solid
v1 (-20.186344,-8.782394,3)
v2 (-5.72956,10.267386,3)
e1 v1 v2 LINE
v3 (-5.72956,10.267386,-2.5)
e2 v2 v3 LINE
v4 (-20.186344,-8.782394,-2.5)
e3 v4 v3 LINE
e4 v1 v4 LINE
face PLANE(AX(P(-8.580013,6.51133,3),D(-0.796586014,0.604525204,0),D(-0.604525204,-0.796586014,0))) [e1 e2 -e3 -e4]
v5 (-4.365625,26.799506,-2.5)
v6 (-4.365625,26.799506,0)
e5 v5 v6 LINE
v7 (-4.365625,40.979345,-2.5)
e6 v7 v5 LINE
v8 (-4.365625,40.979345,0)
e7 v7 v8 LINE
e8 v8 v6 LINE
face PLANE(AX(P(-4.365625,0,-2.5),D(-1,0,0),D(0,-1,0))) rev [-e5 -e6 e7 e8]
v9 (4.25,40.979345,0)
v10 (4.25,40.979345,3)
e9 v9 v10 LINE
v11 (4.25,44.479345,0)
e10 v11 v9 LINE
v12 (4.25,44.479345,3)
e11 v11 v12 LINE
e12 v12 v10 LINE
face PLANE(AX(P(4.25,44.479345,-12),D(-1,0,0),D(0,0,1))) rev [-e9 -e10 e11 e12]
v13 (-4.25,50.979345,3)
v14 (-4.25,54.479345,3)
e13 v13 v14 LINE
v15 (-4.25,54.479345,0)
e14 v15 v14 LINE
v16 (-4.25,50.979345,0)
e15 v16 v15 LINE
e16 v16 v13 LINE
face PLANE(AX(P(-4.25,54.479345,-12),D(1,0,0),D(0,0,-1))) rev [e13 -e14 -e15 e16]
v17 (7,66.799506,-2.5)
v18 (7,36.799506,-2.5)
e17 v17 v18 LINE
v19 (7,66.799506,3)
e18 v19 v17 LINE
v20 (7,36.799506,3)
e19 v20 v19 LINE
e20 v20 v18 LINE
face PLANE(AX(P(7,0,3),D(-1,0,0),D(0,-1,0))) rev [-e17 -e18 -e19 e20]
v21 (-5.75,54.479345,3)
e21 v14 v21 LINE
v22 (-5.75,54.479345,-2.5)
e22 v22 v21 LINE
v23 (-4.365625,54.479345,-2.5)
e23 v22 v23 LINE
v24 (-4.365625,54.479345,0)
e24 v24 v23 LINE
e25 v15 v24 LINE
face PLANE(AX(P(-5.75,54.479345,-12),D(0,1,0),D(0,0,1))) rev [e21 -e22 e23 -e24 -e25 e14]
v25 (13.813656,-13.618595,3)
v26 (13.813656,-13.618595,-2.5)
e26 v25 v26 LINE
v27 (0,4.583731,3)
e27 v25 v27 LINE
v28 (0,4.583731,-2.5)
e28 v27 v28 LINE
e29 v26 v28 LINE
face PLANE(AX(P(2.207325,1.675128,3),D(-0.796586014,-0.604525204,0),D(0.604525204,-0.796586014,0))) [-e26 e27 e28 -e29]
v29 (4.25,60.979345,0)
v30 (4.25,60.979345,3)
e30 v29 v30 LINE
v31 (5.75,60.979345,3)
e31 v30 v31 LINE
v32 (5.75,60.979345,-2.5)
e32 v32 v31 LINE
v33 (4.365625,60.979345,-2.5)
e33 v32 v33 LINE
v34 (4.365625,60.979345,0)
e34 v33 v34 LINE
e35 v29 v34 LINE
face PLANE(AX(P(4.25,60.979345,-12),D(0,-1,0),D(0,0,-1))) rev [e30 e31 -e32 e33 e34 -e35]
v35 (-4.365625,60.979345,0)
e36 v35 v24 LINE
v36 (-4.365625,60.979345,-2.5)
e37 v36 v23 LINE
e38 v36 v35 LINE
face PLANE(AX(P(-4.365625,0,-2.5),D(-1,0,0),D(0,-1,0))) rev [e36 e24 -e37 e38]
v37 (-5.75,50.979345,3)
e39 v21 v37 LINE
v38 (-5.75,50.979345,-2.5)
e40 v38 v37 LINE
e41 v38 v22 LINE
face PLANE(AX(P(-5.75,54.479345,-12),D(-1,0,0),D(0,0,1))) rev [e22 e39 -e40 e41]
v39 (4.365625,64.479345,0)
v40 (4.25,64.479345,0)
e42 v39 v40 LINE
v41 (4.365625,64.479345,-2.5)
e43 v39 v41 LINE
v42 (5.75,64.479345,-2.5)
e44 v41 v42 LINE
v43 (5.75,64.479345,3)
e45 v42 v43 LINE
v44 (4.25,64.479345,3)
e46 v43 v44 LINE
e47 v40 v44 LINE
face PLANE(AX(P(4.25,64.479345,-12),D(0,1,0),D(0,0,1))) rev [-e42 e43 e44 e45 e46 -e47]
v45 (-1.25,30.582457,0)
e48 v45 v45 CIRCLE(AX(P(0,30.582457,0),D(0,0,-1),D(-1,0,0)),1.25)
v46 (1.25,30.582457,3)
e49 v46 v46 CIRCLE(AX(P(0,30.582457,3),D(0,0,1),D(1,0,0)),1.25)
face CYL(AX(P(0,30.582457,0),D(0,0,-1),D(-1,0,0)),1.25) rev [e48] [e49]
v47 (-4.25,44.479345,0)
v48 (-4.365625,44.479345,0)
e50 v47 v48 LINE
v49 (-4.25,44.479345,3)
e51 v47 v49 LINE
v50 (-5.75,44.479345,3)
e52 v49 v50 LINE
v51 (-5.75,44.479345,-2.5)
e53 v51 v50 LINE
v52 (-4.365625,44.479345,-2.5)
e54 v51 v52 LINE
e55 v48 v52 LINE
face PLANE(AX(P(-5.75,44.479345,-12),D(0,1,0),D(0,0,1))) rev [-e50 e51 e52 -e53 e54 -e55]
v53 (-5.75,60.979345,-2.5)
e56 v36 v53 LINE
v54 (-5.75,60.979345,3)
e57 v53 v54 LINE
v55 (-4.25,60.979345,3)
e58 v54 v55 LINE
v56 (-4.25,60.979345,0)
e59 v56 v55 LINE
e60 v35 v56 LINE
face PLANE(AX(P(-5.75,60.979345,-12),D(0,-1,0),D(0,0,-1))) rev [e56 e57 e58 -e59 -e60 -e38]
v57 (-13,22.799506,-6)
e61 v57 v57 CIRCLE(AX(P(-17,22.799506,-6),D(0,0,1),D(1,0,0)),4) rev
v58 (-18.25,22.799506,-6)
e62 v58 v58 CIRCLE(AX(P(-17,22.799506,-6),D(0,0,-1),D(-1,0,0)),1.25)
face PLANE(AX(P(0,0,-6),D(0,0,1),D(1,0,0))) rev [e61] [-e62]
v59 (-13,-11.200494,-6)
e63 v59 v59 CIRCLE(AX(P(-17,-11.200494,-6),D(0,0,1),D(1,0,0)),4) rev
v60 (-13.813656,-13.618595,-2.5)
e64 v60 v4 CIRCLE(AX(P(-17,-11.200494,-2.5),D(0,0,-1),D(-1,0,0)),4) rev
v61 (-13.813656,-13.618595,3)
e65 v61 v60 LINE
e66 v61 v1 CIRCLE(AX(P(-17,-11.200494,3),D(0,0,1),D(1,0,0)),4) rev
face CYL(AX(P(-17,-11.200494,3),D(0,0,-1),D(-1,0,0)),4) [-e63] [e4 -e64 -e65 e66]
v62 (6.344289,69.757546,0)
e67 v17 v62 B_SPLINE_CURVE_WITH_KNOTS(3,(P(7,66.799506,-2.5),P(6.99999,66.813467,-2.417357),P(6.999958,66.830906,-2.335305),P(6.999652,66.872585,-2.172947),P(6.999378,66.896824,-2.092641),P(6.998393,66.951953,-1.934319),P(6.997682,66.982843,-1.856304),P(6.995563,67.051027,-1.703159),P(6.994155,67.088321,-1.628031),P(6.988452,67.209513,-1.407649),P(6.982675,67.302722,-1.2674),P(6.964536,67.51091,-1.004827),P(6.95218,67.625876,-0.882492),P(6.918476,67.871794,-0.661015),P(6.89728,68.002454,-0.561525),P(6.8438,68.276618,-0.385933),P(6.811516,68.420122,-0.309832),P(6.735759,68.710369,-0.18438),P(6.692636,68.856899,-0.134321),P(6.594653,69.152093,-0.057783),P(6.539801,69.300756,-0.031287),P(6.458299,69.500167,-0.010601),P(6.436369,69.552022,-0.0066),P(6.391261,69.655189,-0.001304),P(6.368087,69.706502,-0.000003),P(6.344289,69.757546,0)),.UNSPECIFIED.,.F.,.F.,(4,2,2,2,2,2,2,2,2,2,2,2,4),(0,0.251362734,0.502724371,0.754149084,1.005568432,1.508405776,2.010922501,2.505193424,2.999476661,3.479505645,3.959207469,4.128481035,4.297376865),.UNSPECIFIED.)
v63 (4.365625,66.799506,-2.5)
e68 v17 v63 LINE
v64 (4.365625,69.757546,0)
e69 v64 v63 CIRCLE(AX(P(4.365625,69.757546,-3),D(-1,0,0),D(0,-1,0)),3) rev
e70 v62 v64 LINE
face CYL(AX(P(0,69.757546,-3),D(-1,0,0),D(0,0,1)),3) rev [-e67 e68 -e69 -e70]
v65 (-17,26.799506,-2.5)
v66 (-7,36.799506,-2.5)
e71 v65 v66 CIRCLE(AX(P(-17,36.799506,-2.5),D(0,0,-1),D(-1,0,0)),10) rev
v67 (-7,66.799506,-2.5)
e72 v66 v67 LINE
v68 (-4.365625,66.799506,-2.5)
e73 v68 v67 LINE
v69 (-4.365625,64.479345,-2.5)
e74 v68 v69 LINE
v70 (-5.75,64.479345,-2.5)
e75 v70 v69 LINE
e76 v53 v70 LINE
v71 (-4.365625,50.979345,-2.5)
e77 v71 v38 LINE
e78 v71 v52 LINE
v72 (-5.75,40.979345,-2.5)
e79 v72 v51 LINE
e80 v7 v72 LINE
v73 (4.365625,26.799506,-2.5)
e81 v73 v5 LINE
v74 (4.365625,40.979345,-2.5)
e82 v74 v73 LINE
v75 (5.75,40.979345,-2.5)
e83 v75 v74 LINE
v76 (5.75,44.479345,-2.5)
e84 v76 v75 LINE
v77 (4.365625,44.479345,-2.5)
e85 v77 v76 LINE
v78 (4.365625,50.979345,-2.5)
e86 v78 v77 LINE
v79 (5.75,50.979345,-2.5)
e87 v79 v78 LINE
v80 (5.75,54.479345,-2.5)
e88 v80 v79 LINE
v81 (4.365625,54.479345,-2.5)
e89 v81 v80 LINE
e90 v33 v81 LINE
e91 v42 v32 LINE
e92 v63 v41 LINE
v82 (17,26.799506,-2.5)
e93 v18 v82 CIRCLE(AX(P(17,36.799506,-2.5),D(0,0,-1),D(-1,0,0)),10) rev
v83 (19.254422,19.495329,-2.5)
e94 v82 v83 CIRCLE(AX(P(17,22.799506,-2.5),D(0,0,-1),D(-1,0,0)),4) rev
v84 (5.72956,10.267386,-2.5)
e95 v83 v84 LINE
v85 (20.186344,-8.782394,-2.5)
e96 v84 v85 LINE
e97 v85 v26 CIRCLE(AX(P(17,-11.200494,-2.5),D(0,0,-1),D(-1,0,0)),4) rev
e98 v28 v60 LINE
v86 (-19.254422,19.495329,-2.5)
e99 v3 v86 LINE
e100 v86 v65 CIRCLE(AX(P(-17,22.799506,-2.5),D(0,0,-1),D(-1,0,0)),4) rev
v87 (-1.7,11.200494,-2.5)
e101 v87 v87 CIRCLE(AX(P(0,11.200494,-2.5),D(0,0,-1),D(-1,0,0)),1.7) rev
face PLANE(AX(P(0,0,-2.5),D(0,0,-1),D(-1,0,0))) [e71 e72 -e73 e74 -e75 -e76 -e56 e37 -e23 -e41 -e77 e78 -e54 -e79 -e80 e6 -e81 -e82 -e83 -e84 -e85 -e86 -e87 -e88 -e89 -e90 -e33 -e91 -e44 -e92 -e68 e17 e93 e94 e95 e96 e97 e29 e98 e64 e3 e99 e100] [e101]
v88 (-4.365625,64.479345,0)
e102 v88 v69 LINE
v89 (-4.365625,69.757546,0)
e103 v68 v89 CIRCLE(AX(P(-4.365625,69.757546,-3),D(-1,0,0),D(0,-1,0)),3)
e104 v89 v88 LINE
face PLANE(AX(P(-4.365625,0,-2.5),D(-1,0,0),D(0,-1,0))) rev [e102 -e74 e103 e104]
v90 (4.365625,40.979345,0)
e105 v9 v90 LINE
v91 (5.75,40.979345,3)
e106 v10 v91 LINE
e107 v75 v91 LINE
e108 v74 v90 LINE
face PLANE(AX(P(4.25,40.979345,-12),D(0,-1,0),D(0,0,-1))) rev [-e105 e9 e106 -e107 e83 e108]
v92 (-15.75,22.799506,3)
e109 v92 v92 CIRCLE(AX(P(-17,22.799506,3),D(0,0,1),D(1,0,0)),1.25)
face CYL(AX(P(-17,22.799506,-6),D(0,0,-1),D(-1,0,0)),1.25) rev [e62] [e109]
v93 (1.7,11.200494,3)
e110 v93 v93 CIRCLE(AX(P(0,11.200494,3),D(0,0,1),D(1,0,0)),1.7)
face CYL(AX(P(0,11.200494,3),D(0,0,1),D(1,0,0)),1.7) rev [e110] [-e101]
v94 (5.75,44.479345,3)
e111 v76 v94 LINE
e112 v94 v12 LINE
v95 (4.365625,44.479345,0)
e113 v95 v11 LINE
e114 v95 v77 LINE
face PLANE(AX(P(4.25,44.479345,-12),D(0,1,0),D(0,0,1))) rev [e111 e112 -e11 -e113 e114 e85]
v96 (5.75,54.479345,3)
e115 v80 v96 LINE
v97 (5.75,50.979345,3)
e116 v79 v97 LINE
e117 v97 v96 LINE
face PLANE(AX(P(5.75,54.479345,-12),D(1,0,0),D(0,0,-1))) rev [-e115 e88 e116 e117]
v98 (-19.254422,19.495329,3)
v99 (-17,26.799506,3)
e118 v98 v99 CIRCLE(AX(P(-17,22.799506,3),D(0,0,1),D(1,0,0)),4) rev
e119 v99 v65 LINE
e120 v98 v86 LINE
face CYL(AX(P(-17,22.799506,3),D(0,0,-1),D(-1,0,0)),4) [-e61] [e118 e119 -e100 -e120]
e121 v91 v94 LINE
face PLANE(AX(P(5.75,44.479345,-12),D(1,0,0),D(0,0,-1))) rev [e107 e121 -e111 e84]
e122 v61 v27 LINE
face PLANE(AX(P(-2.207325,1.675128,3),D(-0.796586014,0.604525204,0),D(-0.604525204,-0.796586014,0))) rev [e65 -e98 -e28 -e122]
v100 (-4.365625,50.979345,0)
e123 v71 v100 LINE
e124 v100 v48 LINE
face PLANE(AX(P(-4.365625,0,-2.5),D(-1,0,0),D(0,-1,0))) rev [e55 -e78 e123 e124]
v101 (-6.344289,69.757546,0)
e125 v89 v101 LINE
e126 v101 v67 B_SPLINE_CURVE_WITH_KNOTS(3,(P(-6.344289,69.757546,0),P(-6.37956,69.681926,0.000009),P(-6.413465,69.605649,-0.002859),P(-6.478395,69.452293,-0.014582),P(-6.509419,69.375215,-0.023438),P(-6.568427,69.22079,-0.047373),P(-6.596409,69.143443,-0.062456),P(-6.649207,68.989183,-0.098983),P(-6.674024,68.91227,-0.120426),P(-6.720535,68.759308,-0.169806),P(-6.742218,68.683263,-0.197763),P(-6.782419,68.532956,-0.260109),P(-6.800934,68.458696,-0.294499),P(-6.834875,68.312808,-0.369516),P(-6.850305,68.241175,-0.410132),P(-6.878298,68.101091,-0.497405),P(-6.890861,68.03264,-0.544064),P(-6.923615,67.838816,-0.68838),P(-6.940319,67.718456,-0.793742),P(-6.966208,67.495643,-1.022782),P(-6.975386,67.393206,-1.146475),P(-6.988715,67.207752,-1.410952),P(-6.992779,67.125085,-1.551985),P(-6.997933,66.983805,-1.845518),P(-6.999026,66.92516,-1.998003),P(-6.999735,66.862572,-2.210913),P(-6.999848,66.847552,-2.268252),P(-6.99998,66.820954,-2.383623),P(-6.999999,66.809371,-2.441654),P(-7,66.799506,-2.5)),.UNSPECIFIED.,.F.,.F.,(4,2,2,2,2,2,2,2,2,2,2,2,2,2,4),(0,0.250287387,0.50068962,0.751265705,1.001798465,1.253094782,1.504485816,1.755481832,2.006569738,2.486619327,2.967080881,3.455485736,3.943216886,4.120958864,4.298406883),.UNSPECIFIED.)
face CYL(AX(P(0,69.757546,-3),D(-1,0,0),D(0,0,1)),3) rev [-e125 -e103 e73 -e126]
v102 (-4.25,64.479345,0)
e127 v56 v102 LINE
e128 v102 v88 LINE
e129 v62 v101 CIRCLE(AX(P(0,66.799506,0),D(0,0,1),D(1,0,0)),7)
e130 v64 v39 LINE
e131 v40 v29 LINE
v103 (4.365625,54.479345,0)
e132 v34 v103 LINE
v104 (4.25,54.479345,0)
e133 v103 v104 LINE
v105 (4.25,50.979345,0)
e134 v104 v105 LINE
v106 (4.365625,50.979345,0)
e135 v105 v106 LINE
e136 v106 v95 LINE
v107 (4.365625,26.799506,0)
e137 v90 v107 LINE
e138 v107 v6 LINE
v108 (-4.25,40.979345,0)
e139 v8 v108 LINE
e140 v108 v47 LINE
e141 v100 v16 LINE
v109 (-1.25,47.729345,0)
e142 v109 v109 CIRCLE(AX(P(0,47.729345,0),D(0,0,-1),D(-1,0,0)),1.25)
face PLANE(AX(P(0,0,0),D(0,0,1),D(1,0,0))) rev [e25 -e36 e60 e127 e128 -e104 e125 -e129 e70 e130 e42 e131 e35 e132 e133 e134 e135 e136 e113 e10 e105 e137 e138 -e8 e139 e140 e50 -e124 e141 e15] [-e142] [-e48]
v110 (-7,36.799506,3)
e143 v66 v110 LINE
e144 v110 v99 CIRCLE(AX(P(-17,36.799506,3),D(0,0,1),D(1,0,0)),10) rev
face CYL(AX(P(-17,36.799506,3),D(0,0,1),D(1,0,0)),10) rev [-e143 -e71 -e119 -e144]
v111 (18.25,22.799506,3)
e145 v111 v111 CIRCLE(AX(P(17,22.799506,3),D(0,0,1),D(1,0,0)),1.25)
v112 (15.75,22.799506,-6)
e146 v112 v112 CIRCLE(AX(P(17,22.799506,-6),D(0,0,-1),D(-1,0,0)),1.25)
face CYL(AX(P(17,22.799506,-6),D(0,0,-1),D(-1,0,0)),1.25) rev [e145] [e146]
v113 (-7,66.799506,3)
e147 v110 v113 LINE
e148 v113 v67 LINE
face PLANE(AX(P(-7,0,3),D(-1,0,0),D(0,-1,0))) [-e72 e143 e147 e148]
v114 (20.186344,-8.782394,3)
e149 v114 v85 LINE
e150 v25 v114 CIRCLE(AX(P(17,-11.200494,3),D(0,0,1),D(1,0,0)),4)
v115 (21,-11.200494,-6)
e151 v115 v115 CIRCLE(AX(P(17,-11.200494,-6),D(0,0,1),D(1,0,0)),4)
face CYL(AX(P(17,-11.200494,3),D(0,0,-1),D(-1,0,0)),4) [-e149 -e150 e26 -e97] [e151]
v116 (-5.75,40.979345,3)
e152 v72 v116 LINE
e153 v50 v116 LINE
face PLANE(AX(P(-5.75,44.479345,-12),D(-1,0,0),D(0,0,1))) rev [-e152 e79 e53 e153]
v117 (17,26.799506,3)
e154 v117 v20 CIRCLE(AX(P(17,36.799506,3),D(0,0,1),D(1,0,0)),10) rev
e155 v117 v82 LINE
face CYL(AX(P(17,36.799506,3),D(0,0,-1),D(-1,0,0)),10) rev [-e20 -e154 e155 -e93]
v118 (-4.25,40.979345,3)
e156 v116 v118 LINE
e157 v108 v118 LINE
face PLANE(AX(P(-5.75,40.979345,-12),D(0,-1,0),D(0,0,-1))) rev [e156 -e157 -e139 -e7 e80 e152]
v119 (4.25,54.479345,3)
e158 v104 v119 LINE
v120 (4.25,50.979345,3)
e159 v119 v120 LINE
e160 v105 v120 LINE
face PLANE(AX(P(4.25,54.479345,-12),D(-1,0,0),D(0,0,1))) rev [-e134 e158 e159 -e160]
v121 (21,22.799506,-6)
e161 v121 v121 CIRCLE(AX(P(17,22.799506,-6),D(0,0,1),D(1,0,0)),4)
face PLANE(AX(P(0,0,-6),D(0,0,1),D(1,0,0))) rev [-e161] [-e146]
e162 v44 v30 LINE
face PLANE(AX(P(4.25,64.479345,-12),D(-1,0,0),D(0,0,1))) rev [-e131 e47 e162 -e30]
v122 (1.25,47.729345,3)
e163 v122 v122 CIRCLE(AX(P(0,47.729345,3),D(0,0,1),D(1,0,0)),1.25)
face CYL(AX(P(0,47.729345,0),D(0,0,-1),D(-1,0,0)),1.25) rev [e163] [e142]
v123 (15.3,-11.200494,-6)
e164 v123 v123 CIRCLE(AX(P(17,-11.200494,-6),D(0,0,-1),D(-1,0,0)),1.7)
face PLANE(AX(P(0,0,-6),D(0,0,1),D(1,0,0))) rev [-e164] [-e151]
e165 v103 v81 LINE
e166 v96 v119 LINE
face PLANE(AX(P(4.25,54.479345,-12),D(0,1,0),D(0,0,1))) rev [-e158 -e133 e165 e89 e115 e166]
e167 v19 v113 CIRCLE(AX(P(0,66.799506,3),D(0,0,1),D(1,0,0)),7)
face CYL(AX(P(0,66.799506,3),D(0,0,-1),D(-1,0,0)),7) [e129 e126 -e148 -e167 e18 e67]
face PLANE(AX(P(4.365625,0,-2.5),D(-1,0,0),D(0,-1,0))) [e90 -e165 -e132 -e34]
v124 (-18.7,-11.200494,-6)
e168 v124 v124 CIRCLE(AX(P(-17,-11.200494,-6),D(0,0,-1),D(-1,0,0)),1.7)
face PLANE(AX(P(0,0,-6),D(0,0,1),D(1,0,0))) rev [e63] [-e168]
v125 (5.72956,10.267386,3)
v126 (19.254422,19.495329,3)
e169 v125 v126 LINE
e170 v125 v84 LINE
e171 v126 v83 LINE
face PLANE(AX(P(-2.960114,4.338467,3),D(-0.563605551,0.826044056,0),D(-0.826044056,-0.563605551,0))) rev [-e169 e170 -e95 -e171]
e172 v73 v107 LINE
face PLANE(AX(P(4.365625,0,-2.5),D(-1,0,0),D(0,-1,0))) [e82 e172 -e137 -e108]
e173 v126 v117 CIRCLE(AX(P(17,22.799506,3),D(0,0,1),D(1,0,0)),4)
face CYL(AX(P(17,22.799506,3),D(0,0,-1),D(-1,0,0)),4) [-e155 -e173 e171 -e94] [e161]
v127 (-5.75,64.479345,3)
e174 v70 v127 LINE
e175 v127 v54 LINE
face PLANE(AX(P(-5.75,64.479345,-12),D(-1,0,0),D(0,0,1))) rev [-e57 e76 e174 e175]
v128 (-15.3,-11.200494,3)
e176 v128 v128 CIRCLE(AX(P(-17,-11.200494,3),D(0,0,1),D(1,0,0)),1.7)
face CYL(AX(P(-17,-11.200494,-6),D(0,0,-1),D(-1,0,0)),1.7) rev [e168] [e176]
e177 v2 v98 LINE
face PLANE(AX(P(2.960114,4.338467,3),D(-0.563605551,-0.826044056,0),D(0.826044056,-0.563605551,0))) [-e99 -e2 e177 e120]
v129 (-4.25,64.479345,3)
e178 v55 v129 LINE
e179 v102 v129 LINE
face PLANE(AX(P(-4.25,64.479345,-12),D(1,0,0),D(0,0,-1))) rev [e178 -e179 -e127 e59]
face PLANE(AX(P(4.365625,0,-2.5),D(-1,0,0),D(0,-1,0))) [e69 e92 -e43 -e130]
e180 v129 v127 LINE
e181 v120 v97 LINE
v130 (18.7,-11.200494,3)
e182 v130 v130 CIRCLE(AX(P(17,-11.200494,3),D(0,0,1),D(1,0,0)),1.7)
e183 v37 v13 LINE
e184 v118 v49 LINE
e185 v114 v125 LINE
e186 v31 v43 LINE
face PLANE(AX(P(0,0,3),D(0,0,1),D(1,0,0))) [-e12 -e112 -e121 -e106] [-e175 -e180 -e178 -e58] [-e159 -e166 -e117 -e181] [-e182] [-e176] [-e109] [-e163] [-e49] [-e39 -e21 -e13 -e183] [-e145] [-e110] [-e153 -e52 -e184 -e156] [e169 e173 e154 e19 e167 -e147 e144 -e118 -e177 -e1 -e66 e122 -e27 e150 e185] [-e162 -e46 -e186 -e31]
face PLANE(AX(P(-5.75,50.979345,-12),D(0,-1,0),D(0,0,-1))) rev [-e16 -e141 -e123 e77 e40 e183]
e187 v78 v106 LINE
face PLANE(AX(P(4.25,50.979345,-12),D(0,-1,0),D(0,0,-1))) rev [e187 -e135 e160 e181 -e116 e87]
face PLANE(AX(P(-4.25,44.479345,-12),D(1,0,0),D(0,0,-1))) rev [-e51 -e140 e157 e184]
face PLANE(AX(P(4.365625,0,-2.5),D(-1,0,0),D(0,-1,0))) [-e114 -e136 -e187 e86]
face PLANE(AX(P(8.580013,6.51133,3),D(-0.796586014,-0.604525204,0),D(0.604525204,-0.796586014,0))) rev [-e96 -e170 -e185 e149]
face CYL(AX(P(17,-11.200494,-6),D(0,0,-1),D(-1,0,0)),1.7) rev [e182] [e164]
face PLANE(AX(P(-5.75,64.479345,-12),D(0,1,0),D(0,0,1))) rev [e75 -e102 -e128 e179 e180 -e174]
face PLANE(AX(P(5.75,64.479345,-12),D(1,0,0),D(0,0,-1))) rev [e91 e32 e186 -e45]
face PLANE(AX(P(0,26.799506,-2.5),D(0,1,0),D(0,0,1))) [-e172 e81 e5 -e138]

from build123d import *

# Parameters (mm, degrees)
BOSS_EXTRUDE1_DEPTH             = 3
BOSS_EXTRUDE2_START             = -6
BOSS_EXTRUDE2_DEPTH             = 6
TAP_DRILL_FOR_M3X0_5_TAP1_D     = 2.5
TAP_DRILL_FOR_M3X0_5_TAP1_DEPTH = 10
TAP_DRILL_FOR_M3X0_5_TAP1_TIP   = 0.751075774
M3_CLEARANCE_HOLE1_D            = 3.4
M3_CLEARANCE_HOLE1_DEPTH        = 10
M3_CLEARANCE_HOLE1_TIP          = 1.021463052
M3_CLEARANCE_HOLE2_D            = 3.4
M3_CLEARANCE_HOLE2_DEPTH        = 10
M3_CLEARANCE_HOLE2_TIP          = 1.021463052
BOSS_EXTRUDE3_START             = 2.5
SKETCH9_R                       = 1.7
BOSS_EXTRUDE3_DEPTH             = 2.5
TAP_DRILL_FOR_M3X0_5_TAP2_D     = 2.5
TAP_DRILL_FOR_M3X0_5_TAP2_DEPTH = 10
TAP_DRILL_FOR_M3X0_5_TAP2_TIP   = 0.751075774
SKETCH8_W                       = 1.5
SKETCH8_H                       = 3.5
CUT_EXTRUDE1_DEPTH              = 15
FILLET3_R                       = 3
FILLET4_R                       = 10


# Some blends are built 0.0001 mm under size
with BuildPart() as part:
    # Sketch1 → Boss-Extrude1 (new body)
    with BuildSketch(Plane.XY):
        with BuildLine():
            Line((-5.729559867, 10.267386408), (-20.186344056, -8.782393513))
            ThreePointArc((-20.186344056, -8.782393513), (-19.418100816, -14.386838385), (-13.813655944, -13.618595145))
            Line((-13.813655944, -13.618595145), (0, 4.583731333))
            Line((0, 4.583731333), (13.813655944, -13.618595145))
            ThreePointArc((13.813655944, -13.618595145), (19.418100816, -14.386838385), (20.186344056, -8.782393513))
            Line((20.186344056, -8.782393513), (5.729559867, 10.267386408))
            Line((5.729559867, 10.267386408), (19.254422206, 19.495329447))
            ThreePointArc((19.254422206, 19.495329447), (20.822087446, 23.979186794), (17, 26.799505671))
            Line((17, 26.799505671), (7, 26.799505671))
            Line((7, 26.799505671), (7, 66.799505671))
            ThreePointArc((7, 66.799505671), (0, 73.799505671), (-7, 66.799505671))
            Line((-7, 66.799505671), (-7, 26.799505671))
            Line((-7, 26.799505671), (-17, 26.799505671))
            ThreePointArc((-17, 26.799505671), (-20.822087446, 23.979186794), (-19.254422206, 19.495329447))
            Line((-19.254422206, 19.495329447), (-5.729559867, 10.267386408))
        make_face()
    extrude(amount=BOSS_EXTRUDE1_DEPTH)

    # Sketch1<3> → Boss-Extrude2 (add)
    with BuildSketch(Plane.XY.offset(BOSS_EXTRUDE2_START)):
        with BuildLine():
            ThreePointArc((-21, 22.799505671), (-20.536784473, 20.931042241), (-19.254422206, 19.495329447))
            ThreePointArc((-19.254422206, 19.495329447), (-15.13153657, 19.262721197), (-13, 22.799505671))
            ThreePointArc((-13, 22.799505671), (-13.463215527, 24.667969101), (-14.745577794, 26.103681895))
            ThreePointArc((-14.745577794, 26.103681895), (-15.820318877, 26.621593117), (-17, 26.799505671))
            ThreePointArc((-17, 26.799505671), (-19.828427125, 25.627932795), (-21, 22.799505671))
        make_face()
        with BuildLine():
            ThreePointArc((14.745577794, 26.103681895), (13.695823776, 20.545083465), (19.254422206, 19.495329447))
            ThreePointArc((19.254422206, 19.495329447), (20.536784473, 20.931042241), (21, 22.799505671))
            ThreePointArc((21, 22.799505671), (19.828427125, 25.627932795), (17, 26.799505671))
            ThreePointArc((17, 26.799505671), (15.820318877, 26.621593117), (14.745577794, 26.103681895))
        make_face()
        with BuildLine():
            ThreePointArc((20.186344056, -8.782393513), (14.581899184, -8.014150273), (13.813655944, -13.618595145))
            ThreePointArc((13.813655944, -13.618595145), (15.221293063, -14.783258853), (17, -15.200494329))
            ThreePointArc((17, -15.200494329), (19.828427125, -14.028921454), (21, -11.200494329))
            ThreePointArc((21, -11.200494329), (20.791132827, -9.924832976), (20.186344056, -8.782393513))
        make_face()
        with BuildLine():
            ThreePointArc((-17, -15.200494329), (-15.221293063, -14.783258853), (-13.813655944, -13.618595145))
            ThreePointArc((-13.813655944, -13.618595145), (-13.208867173, -12.476155682), (-13, -11.200494329))
            ThreePointArc((-13, -11.200494329), (-15.724338647, -7.409361502), (-20.186344056, -8.782393513))
            ThreePointArc((-20.186344056, -8.782393513), (-20.791132827, -9.924832976), (-21, -11.200494329))
            ThreePointArc((-21, -11.200494329), (-19.828427125, -14.028921454), (-17, -15.200494329))
        make_face()
    extrude(amount=BOSS_EXTRUDE2_DEPTH)

    # Tap Drill for M3x0.5 Tap1
    with Locations(Plane(origin=(0, 0, -6), x_dir=(-1, 0, 0), z_dir=(0, 0, -1))):
        with Locations((17, 22.799505671), (-17, 22.799505671)):
            Hole(TAP_DRILL_FOR_M3X0_5_TAP1_D / 2, depth=TAP_DRILL_FOR_M3X0_5_TAP1_DEPTH)
            with Locations((0, 0, -(TAP_DRILL_FOR_M3X0_5_TAP1_DEPTH + TAP_DRILL_FOR_M3X0_5_TAP1_TIP / 2))):  # 118° drill point
                Cone(0, TAP_DRILL_FOR_M3X0_5_TAP1_D / 2, TAP_DRILL_FOR_M3X0_5_TAP1_TIP, mode=Mode.SUBTRACT)

    # M3 Clearance Hole1
    with Locations(Plane(origin=(0, 0, -6), x_dir=(-1, 0, 0), z_dir=(0, 0, -1))):
        with Locations((-17, -11.200494329), (17, -11.200494329)):
            Hole(M3_CLEARANCE_HOLE1_D / 2, depth=M3_CLEARANCE_HOLE1_DEPTH)
            with Locations((0, 0, -(M3_CLEARANCE_HOLE1_DEPTH + M3_CLEARANCE_HOLE1_TIP / 2))):  # 118° drill point
                Cone(0, M3_CLEARANCE_HOLE1_D / 2, M3_CLEARANCE_HOLE1_TIP, mode=Mode.SUBTRACT)

    # M3 Clearance Hole2
    with Locations(Plane.XY.offset(3)):
        with Locations((0, 11.200494329)):
            Hole(M3_CLEARANCE_HOLE2_D / 2, depth=M3_CLEARANCE_HOLE2_DEPTH)
            with Locations((0, 0, -(M3_CLEARANCE_HOLE2_DEPTH + M3_CLEARANCE_HOLE2_TIP / 2))):  # 118° drill point
                Cone(0, M3_CLEARANCE_HOLE2_D / 2, M3_CLEARANCE_HOLE2_TIP, mode=Mode.SUBTRACT)

    # Sketch9 → Boss-Extrude3 (add)
    with BuildSketch(Plane(origin=(0, 0, 0), x_dir=(-1, 0, 0), z_dir=(0, 0, -1)).offset(BOSS_EXTRUDE3_START)):
        with BuildLine():
            Line((7, 66.799505671), (4.365625, 66.799505671))
            Line((4.365625, 66.799505671), (4.365625, 26.799505671))
            Line((4.365625, 26.799505671), (-4.365625, 26.799505671))
            Line((-4.365625, 26.799505671), (-4.365625, 66.799505671))
            Line((-4.365625, 66.799505671), (-7, 66.799505671))
            Line((-7, 66.799505671), (-7, 26.799505671))
            Line((-7, 26.799505671), (-17, 26.799505671))
            ThreePointArc((-17, 26.799505671), (-13.177912554, 21.619824548), (-19.254422206, 19.495329447))
            Line((-19.254422206, 19.495329447), (-5.729559867, 10.267386408))
            Line((-5.729559867, 10.267386408), (-20.186344056, -8.782393513))
            ThreePointArc((-20.186344056, -8.782393513), (-14.581899184, -8.014150273), (-13.813655944, -13.618595145))
            Line((-13.813655944, -13.618595145), (0, 4.583731333))
            Line((0, 4.583731333), (13.813655944, -13.618595145))
            ThreePointArc((13.813655944, -13.618595145), (14.581899184, -8.014150273), (20.186344056, -8.782393513))
            Line((20.186344056, -8.782393513), (5.729559867, 10.267386408))
            Line((5.729559867, 10.267386408), (19.254422206, 19.495329447))
            ThreePointArc((19.254422206, 19.495329447), (13.177912554, 21.619824548), (17, 26.799505671))
            Line((17, 26.799505671), (7, 26.799505671))
            Line((7, 26.799505671), (7, 66.799505671))
        make_face()
        with Locations(Location((0, 11.200494329, 0), (0, 0, 179.999999992))):
            Circle(SKETCH9_R, mode=Mode.SUBTRACT)
    extrude(amount=-BOSS_EXTRUDE3_DEPTH)

    # Tap Drill for M3x0.5 Tap2
    with Locations(Plane(origin=(0, 0, 0), x_dir=(-1, 0, 0), z_dir=(0, 0, -1))):
        with Locations((0, 30.58245731), (0, 47.72934455)):
            Hole(TAP_DRILL_FOR_M3X0_5_TAP2_D / 2, depth=TAP_DRILL_FOR_M3X0_5_TAP2_DEPTH)
            with Locations((0, 0, -(TAP_DRILL_FOR_M3X0_5_TAP2_DEPTH + TAP_DRILL_FOR_M3X0_5_TAP2_TIP / 2))):  # 118° drill point
                Cone(0, TAP_DRILL_FOR_M3X0_5_TAP2_D / 2, TAP_DRILL_FOR_M3X0_5_TAP2_TIP, mode=Mode.SUBTRACT)

    # Sketch8 → Cut-Extrude1 (cut)
    with BuildSketch(Plane.XY.offset(3)):
        with Locations((5, 42.72934455)):
            Rectangle(SKETCH8_W, SKETCH8_H)
        with Locations((-5, 42.72934455)):
            Rectangle(SKETCH8_W, SKETCH8_H)
        with Locations((5, 52.72934455)):
            Rectangle(SKETCH8_W, SKETCH8_H)
        with Locations((-5, 52.72934455)):
            Rectangle(SKETCH8_W, SKETCH8_H)
        with Locations((-5, 62.72934455)):
            Rectangle(SKETCH8_W, SKETCH8_H)
        with Locations((5, 62.72934455)):
            Rectangle(SKETCH8_W, SKETCH8_H)
    extrude(amount=-CUT_EXTRUDE1_DEPTH, mode=Mode.SUBTRACT)

    # Fillet3
    # the kernel refuses this fillet: 3 mm, written as the material it adds along each edge
    with BuildSketch(Plane(origin=(4.365625, 66.799505671, 0), x_dir=(0, 0, -1), z_dir=(1, 0, 0))) as fillet3_piece_1_section:
        with BuildLine():
            CenterArc((3, 2.958039892), FILLET3_R, 180, 80.405931773)
            Line((0, 2.958039892), (0, 0))
            Line((0, 0), (2.5, 0))
        make_face()
    fillet3_piece_1 = extrude(amount=10.029474729, mode=Mode.PRIVATE)
    fillet3_piece_1 = fillet3_piece_1 & Plane(origin=(0, 66.799505671, -0.704129577), x_dir=(1, 0, 0), z_dir=(0, 0, -1)) * Cylinder(7, 32, mode=Mode.PRIVATE)
    add(fillet3_piece_1)
    with BuildSketch(Plane(origin=(-14.395099729, 66.799505671, 0), x_dir=(0, 0, -1), z_dir=(1, 0, 0))) as fillet3_piece_2_section:
        with BuildLine():
            CenterArc((3, 2.958039892), FILLET3_R, 180, 80.405931773)
            Line((0, 2.958039892), (0, 0))
            Line((0, 0), (2.5, 0))
        make_face()
    fillet3_piece_2 = extrude(amount=10.029474729, mode=Mode.PRIVATE)
    fillet3_piece_2 = fillet3_piece_2 & Plane(origin=(0, 66.799505671, -0.704129577), x_dir=(1, 0, 0), z_dir=(0, 0, -1)) * Cylinder(7, 32, mode=Mode.PRIVATE)
    add(fillet3_piece_2)

    # Fillet4
    fillet4_edges = [part.edges().sort_by_distance(p)[0] for p in [
        (7, 26.799505671, 0.25),
        (-7, 26.799505671, 0.25),
    ]]
    fillet(fillet4_edges, radius=FILLET4_R - 0.0001)  # a hair under: the kernel refuses the full size


solid = part.part
